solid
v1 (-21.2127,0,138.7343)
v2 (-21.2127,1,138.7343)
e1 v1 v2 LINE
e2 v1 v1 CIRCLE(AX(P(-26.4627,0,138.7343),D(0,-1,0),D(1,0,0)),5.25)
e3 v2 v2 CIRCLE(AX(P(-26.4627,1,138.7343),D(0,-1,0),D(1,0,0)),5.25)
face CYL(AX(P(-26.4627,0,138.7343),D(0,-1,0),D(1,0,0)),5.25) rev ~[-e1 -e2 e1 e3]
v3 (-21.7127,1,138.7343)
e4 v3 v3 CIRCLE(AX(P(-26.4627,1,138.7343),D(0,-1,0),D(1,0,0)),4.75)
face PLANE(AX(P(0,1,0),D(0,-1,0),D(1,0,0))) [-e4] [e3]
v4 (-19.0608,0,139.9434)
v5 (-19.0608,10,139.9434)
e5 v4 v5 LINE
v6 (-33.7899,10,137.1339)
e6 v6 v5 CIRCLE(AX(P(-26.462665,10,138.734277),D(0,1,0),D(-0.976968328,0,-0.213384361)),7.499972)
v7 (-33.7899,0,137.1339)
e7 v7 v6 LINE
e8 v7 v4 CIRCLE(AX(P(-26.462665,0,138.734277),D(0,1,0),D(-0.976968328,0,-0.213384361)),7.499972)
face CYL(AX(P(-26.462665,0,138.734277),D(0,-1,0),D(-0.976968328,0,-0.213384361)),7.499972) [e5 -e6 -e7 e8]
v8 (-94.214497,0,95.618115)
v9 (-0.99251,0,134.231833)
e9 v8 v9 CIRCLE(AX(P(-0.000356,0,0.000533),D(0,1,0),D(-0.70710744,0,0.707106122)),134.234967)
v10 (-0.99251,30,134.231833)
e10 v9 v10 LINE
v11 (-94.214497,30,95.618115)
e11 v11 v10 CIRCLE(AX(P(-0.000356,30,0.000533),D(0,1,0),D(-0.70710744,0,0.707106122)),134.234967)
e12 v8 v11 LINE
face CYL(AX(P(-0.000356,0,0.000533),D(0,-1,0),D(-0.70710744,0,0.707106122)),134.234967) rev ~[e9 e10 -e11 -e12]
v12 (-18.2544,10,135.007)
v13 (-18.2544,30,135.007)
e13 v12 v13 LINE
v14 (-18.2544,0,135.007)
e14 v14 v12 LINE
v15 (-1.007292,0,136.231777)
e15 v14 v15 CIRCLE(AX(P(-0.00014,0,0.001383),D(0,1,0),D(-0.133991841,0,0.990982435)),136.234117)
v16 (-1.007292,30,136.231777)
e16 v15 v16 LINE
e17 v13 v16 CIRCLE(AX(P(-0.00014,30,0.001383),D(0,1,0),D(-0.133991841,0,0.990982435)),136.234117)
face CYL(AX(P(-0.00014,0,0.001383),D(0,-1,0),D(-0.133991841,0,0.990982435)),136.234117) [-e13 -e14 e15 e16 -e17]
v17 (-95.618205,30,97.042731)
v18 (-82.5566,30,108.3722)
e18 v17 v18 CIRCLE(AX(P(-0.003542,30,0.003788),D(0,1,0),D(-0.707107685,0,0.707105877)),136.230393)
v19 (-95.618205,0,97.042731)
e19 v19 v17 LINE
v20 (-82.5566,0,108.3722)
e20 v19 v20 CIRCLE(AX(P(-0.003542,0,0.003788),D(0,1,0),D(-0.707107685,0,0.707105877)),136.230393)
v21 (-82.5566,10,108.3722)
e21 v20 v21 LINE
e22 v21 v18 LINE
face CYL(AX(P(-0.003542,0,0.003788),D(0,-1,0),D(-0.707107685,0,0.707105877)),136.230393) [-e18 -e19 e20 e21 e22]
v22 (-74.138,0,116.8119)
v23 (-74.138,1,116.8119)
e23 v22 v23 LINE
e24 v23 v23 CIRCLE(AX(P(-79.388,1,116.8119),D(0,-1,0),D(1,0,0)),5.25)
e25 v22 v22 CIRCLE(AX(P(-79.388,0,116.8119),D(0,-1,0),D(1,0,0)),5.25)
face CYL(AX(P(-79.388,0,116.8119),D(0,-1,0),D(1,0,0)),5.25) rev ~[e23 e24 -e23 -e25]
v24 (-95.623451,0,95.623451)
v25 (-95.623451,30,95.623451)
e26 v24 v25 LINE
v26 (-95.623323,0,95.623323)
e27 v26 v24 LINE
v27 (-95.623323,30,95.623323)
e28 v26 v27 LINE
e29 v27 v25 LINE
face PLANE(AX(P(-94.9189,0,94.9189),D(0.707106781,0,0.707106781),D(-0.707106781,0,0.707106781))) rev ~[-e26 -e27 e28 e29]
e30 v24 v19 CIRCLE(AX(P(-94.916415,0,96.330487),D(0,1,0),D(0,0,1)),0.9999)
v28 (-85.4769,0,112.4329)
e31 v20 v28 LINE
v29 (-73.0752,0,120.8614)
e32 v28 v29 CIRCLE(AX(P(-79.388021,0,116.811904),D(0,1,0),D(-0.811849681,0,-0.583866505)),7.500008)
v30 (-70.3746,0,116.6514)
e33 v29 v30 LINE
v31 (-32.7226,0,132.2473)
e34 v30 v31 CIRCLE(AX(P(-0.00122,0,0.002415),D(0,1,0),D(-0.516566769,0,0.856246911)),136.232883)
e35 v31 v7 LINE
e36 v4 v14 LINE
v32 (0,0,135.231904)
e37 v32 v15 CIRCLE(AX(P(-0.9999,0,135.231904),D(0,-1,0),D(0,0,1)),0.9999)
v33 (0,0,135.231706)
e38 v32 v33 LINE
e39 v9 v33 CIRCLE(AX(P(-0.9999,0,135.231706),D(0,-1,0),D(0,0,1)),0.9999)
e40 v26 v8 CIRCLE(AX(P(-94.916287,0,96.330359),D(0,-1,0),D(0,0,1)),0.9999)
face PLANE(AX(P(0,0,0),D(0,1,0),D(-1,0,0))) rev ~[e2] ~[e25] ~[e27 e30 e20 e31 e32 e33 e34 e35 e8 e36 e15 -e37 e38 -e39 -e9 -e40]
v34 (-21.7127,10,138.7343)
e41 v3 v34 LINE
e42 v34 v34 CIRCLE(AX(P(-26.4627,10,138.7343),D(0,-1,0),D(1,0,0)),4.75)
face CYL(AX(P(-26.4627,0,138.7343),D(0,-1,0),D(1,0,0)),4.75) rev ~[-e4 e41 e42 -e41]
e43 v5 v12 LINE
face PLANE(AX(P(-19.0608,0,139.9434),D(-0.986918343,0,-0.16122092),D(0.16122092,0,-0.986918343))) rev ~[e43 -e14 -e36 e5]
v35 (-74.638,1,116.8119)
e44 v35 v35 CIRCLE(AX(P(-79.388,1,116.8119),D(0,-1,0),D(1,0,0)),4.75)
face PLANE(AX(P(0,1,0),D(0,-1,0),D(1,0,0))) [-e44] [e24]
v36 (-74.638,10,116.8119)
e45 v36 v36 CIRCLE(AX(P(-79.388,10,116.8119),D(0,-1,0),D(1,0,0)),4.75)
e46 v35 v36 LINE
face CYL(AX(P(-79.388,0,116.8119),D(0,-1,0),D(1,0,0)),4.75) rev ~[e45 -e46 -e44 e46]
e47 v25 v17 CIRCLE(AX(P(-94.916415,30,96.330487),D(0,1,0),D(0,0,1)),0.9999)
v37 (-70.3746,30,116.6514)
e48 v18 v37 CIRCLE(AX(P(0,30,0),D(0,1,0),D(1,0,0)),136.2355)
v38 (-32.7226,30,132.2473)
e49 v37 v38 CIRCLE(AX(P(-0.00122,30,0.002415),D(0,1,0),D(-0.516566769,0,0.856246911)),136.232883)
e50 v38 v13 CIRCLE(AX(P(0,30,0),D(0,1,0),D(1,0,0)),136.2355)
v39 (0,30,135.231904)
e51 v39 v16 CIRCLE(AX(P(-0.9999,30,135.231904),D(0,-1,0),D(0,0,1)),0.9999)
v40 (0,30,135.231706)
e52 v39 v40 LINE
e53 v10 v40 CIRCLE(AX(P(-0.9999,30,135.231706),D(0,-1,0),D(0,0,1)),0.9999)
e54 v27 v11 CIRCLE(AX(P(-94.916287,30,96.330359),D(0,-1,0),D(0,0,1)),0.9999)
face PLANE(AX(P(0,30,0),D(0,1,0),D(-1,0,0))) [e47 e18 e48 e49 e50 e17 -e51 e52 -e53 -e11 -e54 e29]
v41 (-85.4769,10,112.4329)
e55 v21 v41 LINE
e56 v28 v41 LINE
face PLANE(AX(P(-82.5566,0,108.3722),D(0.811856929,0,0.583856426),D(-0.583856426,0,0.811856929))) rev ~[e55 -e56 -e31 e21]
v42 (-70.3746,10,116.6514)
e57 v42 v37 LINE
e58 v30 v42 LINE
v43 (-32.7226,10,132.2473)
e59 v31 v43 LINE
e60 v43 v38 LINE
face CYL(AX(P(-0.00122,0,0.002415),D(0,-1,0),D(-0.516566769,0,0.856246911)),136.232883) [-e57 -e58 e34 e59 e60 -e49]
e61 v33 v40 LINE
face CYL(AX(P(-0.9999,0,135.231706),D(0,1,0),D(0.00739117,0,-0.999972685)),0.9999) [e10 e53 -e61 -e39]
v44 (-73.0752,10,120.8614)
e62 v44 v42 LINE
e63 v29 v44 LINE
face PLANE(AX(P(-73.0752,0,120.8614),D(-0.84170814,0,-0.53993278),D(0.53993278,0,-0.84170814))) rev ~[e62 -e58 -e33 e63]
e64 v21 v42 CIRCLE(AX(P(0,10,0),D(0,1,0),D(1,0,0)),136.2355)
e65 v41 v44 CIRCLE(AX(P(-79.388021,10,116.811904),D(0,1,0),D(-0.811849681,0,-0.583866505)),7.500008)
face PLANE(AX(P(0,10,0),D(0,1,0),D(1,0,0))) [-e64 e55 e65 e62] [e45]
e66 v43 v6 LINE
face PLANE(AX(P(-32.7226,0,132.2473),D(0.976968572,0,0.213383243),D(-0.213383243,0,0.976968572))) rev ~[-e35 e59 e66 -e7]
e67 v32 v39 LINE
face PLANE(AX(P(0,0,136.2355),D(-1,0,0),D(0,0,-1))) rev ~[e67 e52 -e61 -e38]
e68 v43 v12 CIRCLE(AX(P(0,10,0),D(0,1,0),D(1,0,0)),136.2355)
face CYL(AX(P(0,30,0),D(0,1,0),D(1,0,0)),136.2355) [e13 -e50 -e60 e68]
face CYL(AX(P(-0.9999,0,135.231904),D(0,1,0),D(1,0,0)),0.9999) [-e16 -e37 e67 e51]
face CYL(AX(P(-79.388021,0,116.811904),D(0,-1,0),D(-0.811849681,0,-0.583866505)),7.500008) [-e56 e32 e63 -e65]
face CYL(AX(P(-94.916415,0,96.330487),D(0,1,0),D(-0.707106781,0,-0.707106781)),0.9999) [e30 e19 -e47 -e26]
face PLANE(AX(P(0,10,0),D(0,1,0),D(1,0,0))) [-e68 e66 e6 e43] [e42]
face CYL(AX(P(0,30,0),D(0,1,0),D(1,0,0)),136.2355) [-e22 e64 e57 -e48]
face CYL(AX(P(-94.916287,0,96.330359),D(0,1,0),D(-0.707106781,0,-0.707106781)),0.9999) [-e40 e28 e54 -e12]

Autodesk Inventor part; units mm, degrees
ref_plane "YZ Plane" through (0, 0, 0) normal (1, 0, 0) x (0, 1, 0)
ref_plane "XZ Plane" through (0, 0, 0) normal (0, 1, 0) x (-1, 0, 0)
ref_plane "XY Plane" through (0, 0, 0) normal (0, 0, 1) x (1, 0, 0)
sketch "Sketch1" plane through (0, 0, 0) normal (0, 1, 0) x (-1, 0, 0)
  circle A0 centre (26.4627, 138.7343) radius 5
  circle A1 centre (79.388, 116.8119) radius 5
  arc A2 (96.3331, 96.3331) -> (82.5566, 108.3722) centre (0, 0) ccw
  line L0 (82.5566, 108.3722) -> (85.4769, 112.4329)
  arc A3 (85.4769, 112.4329) -> (73.0752, 120.8614) centre (79.388, 116.8119) ccw
  line L1 (73.0752, 120.8614) -> (70.3746, 116.6514)
  arc A4 (70.3746, 116.6514) -> (32.7226, 132.2473) centre (0, 0) ccw
  line L2 (32.7226, 132.2473) -> (33.7899, 137.1339)
  arc A5 (33.7899, 137.1339) -> (19.0608, 139.9434) centre (26.4627, 138.7343) ccw
  line L3 (19.0608, 139.9434) -> (18.2544, 135.007)
  arc A6 (18.2544, 135.007) -> (0, 136.2355) centre (0, 0) ccw
  line L4 (0, 136.2355) -> (0, 134.2355)
  arc A7 (94.9189, 94.9189) -> (0, 134.2355) centre (0, 0) ccw
  line L5 (94.9189, 94.9189) -> (96.3331, 96.3331)
extrude "Extrusion1" add sketch "Sketch1" along normal blind 30 contours A0 | A1 | L5 A7 L4 A6 L3 A5 L2 A4 L1 A3 L0 A2
sketch "Sketch2" plane through (0, 30, 0) normal (0, 1, 0) x (1, 0, 0)
  arc A0 (-96.3331, -96.3331) -> (-82.5566, -108.3722) centre (0, 0) ccw projected
  line L0 (-82.5566, -108.3722) -> (-85.4769, -112.4329) projected
  arc A1 (-85.4769, -112.4329) -> (-73.0752, -120.8614) centre (-79.388, -116.8119) ccw projected
  line L1 (-73.0752, -120.8614) -> (-70.3746, -116.6514) projected
  arc A2 (-70.3746, -116.6514) -> (-32.7226, -132.2473) centre (0, 0) ccw projected
  line L2 (-32.7226, -132.2473) -> (-33.7899, -137.1339) projected
  arc A3 (-33.7899, -137.1339) -> (-19.0608, -139.9434) centre (-26.4627, -138.7343) ccw projected
  line L3 (-19.0608, -139.9434) -> (-18.2544, -135.007) projected
  arc A4 (-18.2544, -135.007) -> (0, -136.2355) centre (0, 0) ccw projected
  line L4 (0, -136.2355) -> (0, -134.2355) projected
  arc A5 (-94.9189, -94.9189) -> (0, -134.2355) centre (0, 0) ccw projected
  line L5 (-94.9189, -94.9189) -> (-96.3331, -96.3331) projected
  circle A6 centre (0, 0) radius 136.2355
  point P0 (0, 0)
  point P1 (-82.5566, -108.3722)
extrude "Extrusion2" cut sketch "Sketch2" against normal blind 20 contours A6 L1 A1 L0 | A6 L3 A3 L2
sketch "Sketch3" plane through (0, 0, 0) normal (0, -1, 0) x (1, 0, 0)
  arc A0 (-82.5566, 108.3722) -> (-96.3331, 96.3331) centre (0, 0) ccw projected
  line L0 (-94.9189, 94.9189) -> (-96.3331, 96.3331) projected
  arc A1 (0, 134.2355) -> (-94.9189, 94.9189) centre (0, 0) ccw projected
  line L1 (0, 136.2355) -> (0, 134.2355) projected
  arc A2 (0, 136.2355) -> (-18.2544, 135.007) centre (0, 0) ccw projected
  line L2 (-19.0608, 139.9434) -> (-18.2544, 135.007) projected
  arc A3 (-19.0608, 139.9434) -> (-33.7899, 137.1339) centre (-26.4627, 138.7343) ccw projected
  line L3 (-32.7226, 132.2473) -> (-33.7899, 137.1339) projected
  arc A4 (-32.7226, 132.2473) -> (-70.3746, 116.6514) centre (0, 0) ccw projected
  line L4 (-73.0752, 120.8614) -> (-70.3746, 116.6514) projected
  arc A5 (-73.0752, 120.8614) -> (-85.4769, 112.4329) centre (-79.388, 116.8119) ccw projected
  line L5 (-82.5566, 108.3722) -> (-85.4769, 112.4329) projected
  circle A6 centre (-26.4627, 138.7343) radius 4.75
  circle A7 centre (-79.388, 116.8119) radius 4.75
  point P0 (0, 0)
  dimension "d7" = 9.5
  dimension "d8" = 9.5
extrude "Extrusion3" cut sketch "Sketch3" against normal blind 10 contours A6 | A7
fillet "Fillet1" radius 1 4 edges at (0, 15, 136.2355) (0, 15, 134.2355) (-96.3331, 15, 96.3331) (-94.9189, 15, 94.9189)
sketch "Sketch4" plane through (0, 0, 0) normal (0, -1, 0) x (1, 0, 0)
  circle A0 centre (-26.4627, 138.7343) radius 4.75 projected
  circle A1 centre (-26.4627, 138.7343) radius 5.25
  circle A2 centre (-79.388, 116.8119) radius 4.75 projected
  circle A3 centre (-79.388, 116.8119) radius 5.25
  point P0 (0, 0)
  dimension "d12" = 10.5
  dimension "d15" = 10.5
extrude "Extrusion4" cut sketch "Sketch4" against normal blind 1 contours A1 | A2 | A3
properties part number "wall_standard"
